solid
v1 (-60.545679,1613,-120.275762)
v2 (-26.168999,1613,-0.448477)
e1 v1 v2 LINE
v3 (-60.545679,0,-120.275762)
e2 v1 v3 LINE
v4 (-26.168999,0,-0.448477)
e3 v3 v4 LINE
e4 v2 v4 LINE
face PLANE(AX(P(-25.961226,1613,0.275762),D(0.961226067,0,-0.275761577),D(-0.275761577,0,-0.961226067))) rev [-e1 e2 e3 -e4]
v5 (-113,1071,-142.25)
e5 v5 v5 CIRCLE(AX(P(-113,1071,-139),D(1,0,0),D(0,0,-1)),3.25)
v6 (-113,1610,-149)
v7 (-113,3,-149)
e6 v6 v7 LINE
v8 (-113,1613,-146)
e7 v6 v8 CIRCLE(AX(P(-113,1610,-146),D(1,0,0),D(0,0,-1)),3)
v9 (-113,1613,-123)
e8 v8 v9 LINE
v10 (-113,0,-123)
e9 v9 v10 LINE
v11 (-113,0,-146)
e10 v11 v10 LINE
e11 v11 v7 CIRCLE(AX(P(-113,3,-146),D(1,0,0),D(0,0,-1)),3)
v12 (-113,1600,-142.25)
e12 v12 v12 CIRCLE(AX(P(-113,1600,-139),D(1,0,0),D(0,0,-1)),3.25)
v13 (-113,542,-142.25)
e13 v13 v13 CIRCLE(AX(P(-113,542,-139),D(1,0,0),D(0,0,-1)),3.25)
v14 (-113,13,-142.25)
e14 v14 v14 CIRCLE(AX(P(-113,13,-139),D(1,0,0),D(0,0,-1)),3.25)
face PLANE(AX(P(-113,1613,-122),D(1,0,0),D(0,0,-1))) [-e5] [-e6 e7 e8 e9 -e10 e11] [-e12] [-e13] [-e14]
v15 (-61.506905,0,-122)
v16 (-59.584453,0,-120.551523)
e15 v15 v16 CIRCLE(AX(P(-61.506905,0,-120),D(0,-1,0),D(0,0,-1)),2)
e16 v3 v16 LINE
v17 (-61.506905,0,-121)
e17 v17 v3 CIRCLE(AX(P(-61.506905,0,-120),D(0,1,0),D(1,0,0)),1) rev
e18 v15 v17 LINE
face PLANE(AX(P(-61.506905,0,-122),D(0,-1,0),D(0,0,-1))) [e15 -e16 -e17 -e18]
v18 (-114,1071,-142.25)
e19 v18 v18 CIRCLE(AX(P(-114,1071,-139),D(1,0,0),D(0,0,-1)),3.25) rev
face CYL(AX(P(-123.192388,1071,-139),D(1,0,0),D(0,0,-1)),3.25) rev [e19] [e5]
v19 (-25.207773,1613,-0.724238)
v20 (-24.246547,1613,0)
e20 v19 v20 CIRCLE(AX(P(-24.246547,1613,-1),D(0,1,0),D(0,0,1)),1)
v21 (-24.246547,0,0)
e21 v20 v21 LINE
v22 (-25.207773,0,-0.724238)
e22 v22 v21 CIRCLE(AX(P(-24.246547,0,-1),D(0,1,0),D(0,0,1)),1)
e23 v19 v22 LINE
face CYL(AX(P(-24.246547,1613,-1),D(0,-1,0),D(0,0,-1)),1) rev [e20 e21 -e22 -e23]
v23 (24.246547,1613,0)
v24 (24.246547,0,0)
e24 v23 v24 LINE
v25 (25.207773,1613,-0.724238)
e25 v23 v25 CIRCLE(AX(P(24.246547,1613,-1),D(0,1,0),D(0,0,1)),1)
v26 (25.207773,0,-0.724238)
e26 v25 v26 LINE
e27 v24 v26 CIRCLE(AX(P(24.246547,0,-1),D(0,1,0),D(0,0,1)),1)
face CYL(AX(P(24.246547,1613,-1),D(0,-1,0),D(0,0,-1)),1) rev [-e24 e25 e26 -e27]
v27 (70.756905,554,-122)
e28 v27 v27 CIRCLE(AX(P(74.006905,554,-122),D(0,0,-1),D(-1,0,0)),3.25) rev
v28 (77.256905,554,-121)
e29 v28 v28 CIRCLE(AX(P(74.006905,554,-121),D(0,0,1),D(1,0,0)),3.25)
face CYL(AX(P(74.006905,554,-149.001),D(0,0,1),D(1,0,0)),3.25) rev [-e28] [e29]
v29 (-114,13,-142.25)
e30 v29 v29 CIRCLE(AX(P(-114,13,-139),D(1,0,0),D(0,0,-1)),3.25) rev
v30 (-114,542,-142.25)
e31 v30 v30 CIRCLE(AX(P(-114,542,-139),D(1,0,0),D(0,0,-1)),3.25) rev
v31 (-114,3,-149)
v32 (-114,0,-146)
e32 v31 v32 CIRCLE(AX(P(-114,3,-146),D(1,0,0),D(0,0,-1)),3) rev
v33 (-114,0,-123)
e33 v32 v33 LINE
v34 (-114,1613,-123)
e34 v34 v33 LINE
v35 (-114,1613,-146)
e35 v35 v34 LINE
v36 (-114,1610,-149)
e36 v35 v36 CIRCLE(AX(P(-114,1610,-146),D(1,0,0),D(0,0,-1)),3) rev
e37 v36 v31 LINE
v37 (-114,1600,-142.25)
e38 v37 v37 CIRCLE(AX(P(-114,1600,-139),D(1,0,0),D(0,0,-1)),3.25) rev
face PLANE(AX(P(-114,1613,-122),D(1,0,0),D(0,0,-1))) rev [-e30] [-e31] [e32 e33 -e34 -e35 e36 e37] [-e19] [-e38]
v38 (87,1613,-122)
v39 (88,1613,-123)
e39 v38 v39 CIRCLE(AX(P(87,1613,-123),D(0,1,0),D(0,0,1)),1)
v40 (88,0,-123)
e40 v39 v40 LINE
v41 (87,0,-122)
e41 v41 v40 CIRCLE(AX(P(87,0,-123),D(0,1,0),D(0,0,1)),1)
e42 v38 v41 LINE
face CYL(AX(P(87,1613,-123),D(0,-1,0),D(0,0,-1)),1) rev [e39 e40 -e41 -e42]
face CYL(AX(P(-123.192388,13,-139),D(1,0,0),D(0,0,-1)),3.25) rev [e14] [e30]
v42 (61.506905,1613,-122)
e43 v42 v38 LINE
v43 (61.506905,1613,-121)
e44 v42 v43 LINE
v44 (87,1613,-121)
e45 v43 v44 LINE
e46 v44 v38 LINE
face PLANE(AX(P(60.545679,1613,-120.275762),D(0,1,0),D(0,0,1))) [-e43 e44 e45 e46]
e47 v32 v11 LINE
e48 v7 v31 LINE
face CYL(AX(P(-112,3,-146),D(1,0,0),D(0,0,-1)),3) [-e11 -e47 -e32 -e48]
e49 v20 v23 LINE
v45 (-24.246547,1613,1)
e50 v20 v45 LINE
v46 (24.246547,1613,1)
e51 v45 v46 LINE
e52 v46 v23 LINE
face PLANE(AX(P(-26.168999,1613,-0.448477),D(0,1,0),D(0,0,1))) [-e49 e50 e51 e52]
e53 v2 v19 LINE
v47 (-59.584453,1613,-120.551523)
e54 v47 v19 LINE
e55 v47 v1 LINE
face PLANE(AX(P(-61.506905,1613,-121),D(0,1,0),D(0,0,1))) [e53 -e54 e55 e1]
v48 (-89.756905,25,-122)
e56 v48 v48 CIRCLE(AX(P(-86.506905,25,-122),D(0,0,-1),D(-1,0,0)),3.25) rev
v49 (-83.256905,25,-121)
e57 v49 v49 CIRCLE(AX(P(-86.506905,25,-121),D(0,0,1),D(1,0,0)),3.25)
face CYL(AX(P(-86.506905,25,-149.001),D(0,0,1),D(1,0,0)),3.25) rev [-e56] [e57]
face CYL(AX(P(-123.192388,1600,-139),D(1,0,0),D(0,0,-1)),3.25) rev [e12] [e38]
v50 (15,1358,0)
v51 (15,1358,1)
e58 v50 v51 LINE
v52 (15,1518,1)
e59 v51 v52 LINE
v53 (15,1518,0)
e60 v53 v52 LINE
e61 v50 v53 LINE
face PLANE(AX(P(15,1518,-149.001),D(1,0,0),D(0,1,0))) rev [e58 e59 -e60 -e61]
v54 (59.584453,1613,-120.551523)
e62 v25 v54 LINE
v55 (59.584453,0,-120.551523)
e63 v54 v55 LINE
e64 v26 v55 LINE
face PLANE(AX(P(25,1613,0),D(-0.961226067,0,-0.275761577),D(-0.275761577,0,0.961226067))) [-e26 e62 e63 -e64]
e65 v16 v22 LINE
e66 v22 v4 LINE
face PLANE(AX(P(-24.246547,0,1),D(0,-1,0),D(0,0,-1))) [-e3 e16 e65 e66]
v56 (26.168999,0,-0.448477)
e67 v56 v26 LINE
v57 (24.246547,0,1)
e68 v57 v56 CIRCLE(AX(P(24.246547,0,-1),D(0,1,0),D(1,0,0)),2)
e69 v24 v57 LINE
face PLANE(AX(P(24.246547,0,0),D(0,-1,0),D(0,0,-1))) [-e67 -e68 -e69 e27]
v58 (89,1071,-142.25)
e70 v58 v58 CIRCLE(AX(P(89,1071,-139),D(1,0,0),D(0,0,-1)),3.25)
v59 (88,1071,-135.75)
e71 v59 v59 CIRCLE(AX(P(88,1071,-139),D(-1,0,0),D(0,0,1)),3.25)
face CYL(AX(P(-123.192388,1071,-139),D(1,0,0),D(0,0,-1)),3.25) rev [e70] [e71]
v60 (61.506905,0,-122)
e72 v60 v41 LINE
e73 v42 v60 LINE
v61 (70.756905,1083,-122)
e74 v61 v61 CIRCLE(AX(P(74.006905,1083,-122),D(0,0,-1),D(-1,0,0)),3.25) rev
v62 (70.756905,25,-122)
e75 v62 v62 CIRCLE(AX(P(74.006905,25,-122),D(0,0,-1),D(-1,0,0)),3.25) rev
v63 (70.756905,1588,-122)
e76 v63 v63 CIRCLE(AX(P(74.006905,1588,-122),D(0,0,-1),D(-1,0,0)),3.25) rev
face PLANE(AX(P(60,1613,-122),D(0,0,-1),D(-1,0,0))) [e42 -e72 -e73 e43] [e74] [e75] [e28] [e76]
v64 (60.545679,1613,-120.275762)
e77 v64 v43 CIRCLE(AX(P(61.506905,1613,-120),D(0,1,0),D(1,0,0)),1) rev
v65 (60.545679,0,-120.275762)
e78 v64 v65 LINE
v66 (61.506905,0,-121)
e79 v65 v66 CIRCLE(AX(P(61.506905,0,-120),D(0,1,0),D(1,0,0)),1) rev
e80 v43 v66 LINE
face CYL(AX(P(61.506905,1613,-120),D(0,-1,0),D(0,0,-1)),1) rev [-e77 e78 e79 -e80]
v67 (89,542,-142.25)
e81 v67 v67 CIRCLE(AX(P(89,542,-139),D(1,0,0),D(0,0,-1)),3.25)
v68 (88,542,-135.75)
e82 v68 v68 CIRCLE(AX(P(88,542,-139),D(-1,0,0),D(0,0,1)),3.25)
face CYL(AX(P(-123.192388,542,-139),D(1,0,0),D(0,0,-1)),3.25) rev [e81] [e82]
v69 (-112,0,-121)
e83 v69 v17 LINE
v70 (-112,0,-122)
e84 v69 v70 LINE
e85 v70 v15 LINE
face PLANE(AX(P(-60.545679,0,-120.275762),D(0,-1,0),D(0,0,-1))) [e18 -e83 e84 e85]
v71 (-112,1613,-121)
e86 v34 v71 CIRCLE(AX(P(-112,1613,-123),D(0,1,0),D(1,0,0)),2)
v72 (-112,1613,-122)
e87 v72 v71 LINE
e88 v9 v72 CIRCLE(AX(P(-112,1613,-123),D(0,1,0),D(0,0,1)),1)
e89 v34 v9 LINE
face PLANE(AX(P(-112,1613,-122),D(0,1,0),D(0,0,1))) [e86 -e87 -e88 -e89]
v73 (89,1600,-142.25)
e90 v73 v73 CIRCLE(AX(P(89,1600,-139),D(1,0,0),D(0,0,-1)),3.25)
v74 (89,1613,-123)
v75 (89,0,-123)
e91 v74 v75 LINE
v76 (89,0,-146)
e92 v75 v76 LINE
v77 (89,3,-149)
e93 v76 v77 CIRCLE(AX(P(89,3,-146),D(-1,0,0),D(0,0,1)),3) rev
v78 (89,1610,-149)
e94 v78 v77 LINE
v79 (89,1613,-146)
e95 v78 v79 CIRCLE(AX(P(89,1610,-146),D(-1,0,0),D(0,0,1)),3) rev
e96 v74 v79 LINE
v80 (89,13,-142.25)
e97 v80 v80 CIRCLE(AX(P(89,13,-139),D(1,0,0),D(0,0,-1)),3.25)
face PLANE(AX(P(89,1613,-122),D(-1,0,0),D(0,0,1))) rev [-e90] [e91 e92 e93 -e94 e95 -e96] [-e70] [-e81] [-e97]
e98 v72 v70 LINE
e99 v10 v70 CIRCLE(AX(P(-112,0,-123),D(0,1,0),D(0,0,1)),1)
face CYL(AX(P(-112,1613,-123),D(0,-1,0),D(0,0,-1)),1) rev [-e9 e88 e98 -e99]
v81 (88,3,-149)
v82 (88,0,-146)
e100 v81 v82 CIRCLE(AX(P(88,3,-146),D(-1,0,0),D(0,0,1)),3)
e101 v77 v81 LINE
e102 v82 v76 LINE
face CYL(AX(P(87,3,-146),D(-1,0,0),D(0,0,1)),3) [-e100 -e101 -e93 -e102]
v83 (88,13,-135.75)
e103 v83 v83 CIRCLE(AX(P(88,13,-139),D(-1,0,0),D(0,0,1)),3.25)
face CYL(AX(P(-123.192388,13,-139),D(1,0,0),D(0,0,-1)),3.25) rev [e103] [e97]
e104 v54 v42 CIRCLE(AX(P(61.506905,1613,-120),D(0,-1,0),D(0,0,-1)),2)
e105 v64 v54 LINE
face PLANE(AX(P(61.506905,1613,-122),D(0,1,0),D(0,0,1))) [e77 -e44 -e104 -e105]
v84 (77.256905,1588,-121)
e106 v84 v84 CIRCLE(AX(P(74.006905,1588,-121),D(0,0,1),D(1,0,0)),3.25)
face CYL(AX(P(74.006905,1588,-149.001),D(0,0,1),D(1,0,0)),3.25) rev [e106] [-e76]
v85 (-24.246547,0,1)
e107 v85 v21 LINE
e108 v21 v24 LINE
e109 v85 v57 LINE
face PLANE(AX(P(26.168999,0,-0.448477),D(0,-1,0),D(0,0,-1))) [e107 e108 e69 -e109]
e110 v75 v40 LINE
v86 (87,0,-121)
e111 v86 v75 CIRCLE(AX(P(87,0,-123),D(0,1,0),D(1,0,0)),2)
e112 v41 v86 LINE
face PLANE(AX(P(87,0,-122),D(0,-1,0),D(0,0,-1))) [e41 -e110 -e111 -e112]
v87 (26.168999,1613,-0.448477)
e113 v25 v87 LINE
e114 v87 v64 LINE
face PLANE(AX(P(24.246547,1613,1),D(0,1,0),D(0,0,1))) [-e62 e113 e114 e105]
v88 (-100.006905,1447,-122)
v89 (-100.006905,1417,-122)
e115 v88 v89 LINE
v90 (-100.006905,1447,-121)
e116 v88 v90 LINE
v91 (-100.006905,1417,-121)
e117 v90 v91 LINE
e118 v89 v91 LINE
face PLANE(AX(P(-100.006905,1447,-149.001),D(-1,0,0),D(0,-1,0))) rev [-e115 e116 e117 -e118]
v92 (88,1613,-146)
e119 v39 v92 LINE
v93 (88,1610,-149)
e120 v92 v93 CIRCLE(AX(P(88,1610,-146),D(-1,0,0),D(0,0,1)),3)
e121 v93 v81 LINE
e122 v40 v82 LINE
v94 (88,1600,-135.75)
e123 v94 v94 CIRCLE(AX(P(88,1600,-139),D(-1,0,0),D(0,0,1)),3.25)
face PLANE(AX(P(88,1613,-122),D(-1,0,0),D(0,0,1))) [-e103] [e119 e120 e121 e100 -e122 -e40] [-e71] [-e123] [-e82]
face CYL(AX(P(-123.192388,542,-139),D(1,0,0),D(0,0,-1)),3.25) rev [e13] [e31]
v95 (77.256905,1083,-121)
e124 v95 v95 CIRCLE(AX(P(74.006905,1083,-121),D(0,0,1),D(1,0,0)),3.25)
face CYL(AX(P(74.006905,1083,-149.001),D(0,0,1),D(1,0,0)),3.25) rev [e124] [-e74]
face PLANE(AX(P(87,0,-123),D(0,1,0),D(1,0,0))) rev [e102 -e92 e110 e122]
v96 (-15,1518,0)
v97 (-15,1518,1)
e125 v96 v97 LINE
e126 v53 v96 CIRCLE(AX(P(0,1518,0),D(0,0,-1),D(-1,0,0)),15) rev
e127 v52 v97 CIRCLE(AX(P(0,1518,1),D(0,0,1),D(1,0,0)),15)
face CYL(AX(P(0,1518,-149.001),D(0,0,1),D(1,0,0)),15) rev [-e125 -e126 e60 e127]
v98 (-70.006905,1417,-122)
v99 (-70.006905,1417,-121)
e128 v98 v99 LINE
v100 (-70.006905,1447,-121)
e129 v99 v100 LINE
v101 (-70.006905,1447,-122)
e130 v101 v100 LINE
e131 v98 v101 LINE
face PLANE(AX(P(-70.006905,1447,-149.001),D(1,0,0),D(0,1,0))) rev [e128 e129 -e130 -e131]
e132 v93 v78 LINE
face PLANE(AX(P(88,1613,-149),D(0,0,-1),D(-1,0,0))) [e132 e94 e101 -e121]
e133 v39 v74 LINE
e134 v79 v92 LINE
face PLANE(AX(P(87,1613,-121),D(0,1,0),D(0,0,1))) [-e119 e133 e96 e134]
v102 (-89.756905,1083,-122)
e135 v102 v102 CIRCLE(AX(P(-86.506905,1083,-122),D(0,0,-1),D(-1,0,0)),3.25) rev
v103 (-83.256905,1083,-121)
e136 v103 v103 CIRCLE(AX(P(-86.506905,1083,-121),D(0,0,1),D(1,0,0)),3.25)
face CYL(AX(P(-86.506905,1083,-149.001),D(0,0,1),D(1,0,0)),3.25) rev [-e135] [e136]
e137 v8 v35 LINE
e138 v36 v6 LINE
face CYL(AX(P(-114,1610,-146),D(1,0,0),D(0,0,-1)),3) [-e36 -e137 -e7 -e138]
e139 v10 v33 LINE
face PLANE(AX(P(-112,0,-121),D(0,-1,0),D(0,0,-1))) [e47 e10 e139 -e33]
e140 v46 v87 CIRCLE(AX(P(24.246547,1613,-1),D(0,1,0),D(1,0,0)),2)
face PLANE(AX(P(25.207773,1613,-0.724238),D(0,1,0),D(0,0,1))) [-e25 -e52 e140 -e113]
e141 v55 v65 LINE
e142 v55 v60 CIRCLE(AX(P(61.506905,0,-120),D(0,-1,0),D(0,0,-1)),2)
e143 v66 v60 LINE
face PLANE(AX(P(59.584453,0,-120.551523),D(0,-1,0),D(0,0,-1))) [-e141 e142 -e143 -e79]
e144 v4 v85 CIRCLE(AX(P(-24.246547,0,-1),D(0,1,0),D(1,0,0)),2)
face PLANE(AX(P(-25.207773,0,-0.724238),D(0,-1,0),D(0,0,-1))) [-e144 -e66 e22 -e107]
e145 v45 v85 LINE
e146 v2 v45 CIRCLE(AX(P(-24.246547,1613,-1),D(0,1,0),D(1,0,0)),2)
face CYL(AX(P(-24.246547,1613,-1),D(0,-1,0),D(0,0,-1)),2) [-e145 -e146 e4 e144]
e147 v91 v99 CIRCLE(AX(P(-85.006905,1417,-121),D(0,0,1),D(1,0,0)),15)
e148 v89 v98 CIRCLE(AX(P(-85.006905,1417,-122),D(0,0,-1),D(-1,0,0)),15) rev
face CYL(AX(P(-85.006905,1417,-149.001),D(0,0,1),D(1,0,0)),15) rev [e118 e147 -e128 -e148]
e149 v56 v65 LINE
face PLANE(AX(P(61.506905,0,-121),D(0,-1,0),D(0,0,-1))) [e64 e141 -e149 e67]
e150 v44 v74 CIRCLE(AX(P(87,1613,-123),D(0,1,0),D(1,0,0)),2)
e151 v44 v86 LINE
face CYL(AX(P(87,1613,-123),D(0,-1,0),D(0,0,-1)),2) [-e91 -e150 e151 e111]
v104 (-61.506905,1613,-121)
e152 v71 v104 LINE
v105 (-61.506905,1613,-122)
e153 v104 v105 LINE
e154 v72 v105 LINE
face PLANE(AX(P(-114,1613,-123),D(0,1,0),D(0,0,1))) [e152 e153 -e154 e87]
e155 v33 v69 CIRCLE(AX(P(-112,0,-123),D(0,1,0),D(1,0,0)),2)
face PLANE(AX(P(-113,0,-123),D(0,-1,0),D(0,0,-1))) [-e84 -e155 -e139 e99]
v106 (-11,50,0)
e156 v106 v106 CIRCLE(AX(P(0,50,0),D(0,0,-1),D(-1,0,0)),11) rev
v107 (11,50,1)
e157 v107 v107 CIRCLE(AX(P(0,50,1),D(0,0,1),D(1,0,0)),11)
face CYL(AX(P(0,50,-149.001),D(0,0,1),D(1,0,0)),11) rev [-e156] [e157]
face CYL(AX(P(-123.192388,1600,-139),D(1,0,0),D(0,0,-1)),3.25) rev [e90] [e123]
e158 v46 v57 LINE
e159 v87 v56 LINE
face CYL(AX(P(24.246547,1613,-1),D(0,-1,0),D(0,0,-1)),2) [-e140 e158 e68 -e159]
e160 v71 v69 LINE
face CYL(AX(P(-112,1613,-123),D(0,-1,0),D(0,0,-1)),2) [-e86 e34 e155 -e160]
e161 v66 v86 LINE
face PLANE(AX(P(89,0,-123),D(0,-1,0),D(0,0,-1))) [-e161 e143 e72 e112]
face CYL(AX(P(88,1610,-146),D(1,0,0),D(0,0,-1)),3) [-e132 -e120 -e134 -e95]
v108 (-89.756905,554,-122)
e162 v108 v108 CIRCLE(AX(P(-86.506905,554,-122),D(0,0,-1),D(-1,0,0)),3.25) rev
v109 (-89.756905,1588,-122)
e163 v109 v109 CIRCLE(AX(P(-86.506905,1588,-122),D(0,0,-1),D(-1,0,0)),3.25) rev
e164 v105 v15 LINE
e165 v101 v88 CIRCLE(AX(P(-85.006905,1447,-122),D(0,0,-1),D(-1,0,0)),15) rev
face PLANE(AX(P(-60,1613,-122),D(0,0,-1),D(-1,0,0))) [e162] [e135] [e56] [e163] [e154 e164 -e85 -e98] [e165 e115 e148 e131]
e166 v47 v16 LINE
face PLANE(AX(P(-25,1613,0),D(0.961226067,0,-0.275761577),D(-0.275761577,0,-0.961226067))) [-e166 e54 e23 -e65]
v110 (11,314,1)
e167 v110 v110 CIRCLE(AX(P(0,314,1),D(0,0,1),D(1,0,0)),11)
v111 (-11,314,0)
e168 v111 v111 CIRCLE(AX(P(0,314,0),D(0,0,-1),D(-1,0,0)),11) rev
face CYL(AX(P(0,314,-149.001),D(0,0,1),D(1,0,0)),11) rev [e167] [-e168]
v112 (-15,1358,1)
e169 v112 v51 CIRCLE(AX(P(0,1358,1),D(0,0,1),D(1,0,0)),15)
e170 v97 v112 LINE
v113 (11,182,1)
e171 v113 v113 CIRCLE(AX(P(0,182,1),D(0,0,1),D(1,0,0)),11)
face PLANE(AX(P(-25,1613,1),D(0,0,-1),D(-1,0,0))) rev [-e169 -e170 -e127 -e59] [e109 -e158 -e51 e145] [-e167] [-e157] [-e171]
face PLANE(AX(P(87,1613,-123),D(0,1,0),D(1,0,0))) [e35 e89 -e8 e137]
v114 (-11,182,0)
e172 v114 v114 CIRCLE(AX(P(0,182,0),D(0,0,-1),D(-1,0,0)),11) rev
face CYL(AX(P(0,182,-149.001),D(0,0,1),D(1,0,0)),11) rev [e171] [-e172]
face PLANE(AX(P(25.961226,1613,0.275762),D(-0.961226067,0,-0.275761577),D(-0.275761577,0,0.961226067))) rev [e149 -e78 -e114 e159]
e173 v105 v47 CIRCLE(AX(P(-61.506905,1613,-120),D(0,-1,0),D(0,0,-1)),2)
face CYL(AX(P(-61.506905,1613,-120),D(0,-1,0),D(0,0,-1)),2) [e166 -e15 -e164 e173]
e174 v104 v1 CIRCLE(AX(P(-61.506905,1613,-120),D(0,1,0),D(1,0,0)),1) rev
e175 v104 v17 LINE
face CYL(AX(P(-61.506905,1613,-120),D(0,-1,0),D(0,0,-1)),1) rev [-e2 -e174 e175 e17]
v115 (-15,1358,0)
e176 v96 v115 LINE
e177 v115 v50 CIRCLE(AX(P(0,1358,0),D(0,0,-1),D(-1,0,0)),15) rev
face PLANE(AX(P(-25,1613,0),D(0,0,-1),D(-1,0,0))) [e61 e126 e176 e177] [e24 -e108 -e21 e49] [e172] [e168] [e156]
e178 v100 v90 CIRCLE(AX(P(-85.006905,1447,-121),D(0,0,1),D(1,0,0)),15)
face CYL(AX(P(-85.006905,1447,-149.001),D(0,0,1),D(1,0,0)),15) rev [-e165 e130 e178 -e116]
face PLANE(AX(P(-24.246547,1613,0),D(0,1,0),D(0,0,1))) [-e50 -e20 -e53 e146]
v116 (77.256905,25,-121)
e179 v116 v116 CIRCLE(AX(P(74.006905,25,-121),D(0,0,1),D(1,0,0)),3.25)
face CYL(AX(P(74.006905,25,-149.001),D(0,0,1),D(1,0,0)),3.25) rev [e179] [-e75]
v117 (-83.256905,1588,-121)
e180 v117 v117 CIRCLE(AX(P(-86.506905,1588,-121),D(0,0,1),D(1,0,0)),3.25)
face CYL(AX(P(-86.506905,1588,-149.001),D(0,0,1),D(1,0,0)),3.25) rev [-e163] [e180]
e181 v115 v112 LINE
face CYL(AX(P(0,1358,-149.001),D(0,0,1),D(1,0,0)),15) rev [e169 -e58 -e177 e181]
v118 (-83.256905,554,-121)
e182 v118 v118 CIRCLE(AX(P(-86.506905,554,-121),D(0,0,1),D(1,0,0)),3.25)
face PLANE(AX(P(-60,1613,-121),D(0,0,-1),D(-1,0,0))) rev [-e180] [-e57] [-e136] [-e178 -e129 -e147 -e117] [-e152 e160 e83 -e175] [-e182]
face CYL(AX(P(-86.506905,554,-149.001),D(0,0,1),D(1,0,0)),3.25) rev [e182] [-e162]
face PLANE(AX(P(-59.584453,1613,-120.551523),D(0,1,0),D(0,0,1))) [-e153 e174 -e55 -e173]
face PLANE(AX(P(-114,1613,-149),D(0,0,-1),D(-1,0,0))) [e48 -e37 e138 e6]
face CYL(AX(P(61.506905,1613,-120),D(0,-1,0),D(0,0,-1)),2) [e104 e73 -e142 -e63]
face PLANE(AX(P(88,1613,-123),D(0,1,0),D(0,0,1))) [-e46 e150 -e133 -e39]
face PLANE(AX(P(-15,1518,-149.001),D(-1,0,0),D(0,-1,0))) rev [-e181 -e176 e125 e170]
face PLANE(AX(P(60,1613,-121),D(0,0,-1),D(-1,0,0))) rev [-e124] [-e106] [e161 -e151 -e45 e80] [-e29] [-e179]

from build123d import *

# Parameters (mm, degrees)
BASE_FLANGE1_DEPTH  = 1613
FILLET1_R           = 3
CUT_EXTRUDE1_REACH  = 1625.966
SKETCH6_R           = 11
LPATTERN1_COUNT     = 3
LPATTERN1_PITCH     = 132
CUT_EXTRUDE4_REACH  = 1634.045
SKETCH10_R          = 3.25
LPATTERN5_COUNT     = 4
LPATTERN5_PITCH     = 529
CUT_EXTRUDE5_REACH  = 1623.619
CUT_EXTRUDE6_REACH  = 1623.619
SKETCH13_R          = 3.25
CUT_EXTRUDE7_REACH  = 1623.619
SKETCH14_R          = 3.25
LPATTERN6_COUNT     = 3
LPATTERN6_PITCH     = 529
CUT_EXTRUDE8_REACH  = 1623.619
SKETCH15_R          = 3.25
CUT_EXTRUDE9_REACH  = 1623.619
SKETCH16_R          = 3.25
CUT_EXTRUDE10_REACH = 1625.966


# Sheet-metal steps are written as plain solids
with BuildPart() as part:
    # Sketch1 → Base-Flange1 (new body)
    with BuildSketch(Plane(origin=(0, 0, 0), x_dir=(1, 0, 0), z_dir=(0, 1, 0))):
        with BuildLine():
            Line((-113, 149), (-113, 123))
            ThreePointArc((-113, 123), (-112.707106781, 122.292893219), (-112, 122))
            Line((-112, 122), (-61.506905499, 122))
            ThreePointArc((-61.506905499, 122), (-60.303378662, 121.597348789), (-59.584453364, 120.551523153))
            Line((-59.584453364, 120.551523153), (-25.207773318, 0.724238423))
            ThreePointArc((-25.207773318, 0.724238423), (-24.848310669, 0.201325606), (-24.246547251, 0))
            Line((-24.246547251, 0), (24.246547251, 0))
            ThreePointArc((24.246547251, 0), (24.848310669, 0.201325606), (25.207773318, 0.724238423))
            Line((25.207773318, 0.724238423), (59.584453364, 120.551523153))
            ThreePointArc((59.584453364, 120.551523153), (60.303378662, 121.597348789), (61.506905499, 122))
            Line((61.506905499, 122), (87, 122))
            ThreePointArc((87, 122), (87.707106781, 122.292893219), (88, 123))
            Line((88, 123), (88, 149))
            Line((88, 149), (89, 149))
            Line((89, 149), (89, 123))
            ThreePointArc((89, 123), (88.414213562, 121.585786438), (87, 121))
            Line((87, 121), (61.506905499, 121))
            ThreePointArc((61.506905499, 121), (60.90514208, 120.798674394), (60.545679431, 120.275761577))
            Line((60.545679431, 120.275761577), (26.168999386, 0.448476847))
            ThreePointArc((26.168999386, 0.448476847), (25.450074087, -0.597348789), (24.246547251, -1))
            Line((24.246547251, -1), (-24.246547251, -1))
            ThreePointArc((-24.246547251, -1), (-25.450074087, -0.597348789), (-26.168999386, 0.448476847))
            Line((-26.168999386, 0.448476847), (-60.545679431, 120.275761577))
            ThreePointArc((-60.545679431, 120.275761577), (-60.90514208, 120.798674394), (-61.506905499, 121))
            Line((-61.506905499, 121), (-112, 121))
            ThreePointArc((-112, 121), (-113.414213562, 121.585786438), (-114, 123))
            Line((-114, 123), (-114, 149))
            Line((-114, 149), (-113, 149))
        make_face()
    extrude(amount=BASE_FLANGE1_DEPTH)

    # Fillet1
    fillet1_edges = [part.edges().sort_by_distance(p)[0] for p in [
        (-113.5, 0, -149),
        (88.5, 0, -149),
        (-113.5, 1613, -149),
        (88.5, 1613, -149),
    ]]
    fillet(fillet1_edges, radius=FILLET1_R)

    # Sketch6 → Cut-Extrude1 (cut, up to next)
    with BuildSketch(Plane.XY.offset(1), mode=Mode.PRIVATE) as cut_extrude1_sk1:
        with Locations((0, 50)):
            Circle(SKETCH6_R)
    cut_extrude1_tool1 = extrude(cut_extrude1_sk1.sketch, amount=-CUT_EXTRUDE1_REACH, mode=Mode.PRIVATE) & part.part
    cut_extrude1 = cut_extrude1_tool1.solids().sort_by_distance((0, 50, 1))[0]
    add(cut_extrude1, mode=Mode.SUBTRACT)

    # LPattern1: Cut-Extrude1 ×3
    with Locations(*[(0, i * LPATTERN1_PITCH, 0) for i in range(1, LPATTERN1_COUNT)]):
        add(cut_extrude1, mode=Mode.SUBTRACT)

    # Cut-Extrude4: up to this face of the body (flat: up to its plane)
    cut_extrude4_end = Plane(part.part.faces().sort_by_distance((-114, 806.5, -135.998864211))[0])
    # Sketch10 → Cut-Extrude4 (cut, up to the picked face)
    with BuildSketch(Plane(origin=(89, 0, -5.5), x_dir=(0, 0, -1), z_dir=(1, 0, 0)), mode=Mode.PRIVATE) as cut_extrude4_sk1:
        with Locations((133.5, 13)):
            Circle(SKETCH10_R)
    cut_extrude4_tool1 = split(extrude(cut_extrude4_sk1.sketch, amount=-CUT_EXTRUDE4_REACH, mode=Mode.PRIVATE), bisect_by=cut_extrude4_end, keep=Keep.BOTH, mode=Mode.PRIVATE)
    cut_extrude4 = cut_extrude4_tool1.solids().sort_by(Axis((89, 13, -139), (-1, 0, 0)))[0]
    add(cut_extrude4, mode=Mode.SUBTRACT)

    # LPattern5: Cut-Extrude4 ×4
    with Locations(*[(0, i * LPATTERN5_PITCH, 0) for i in range(1, LPATTERN5_COUNT)]):
        add(cut_extrude4, mode=Mode.SUBTRACT)

    # Sketch12 → Cut-Extrude5 (cut, up to next)
    with BuildSketch(Plane.XY.offset(-121), mode=Mode.PRIVATE) as cut_extrude5_sk1:
        with BuildLine():
            Line((-70.006905499, 1447), (-70.006905499, 1417))
            ThreePointArc((-70.006905499, 1417), (-85.006905499, 1402), (-100.006905499, 1417))
            Line((-100.006905499, 1417), (-100.006905499, 1447))
            ThreePointArc((-100.006905499, 1447), (-85.006905499, 1462), (-70.006905499, 1447))
        make_face()
    cut_extrude5_tool1 = extrude(cut_extrude5_sk1.sketch, amount=-CUT_EXTRUDE5_REACH, mode=Mode.PRIVATE) & part.part
    add(cut_extrude5_tool1.solids().sort_by_distance((-85.006905, 1432, -121))[0], mode=Mode.SUBTRACT)

    # Sketch13 → Cut-Extrude6 (cut, up to next)
    with BuildSketch(Plane.XY.offset(-121), mode=Mode.PRIVATE) as cut_extrude6_sk1:
        with Locations((-86.506905499, 25)):
            Circle(SKETCH13_R)
    cut_extrude6_tool1 = extrude(cut_extrude6_sk1.sketch, amount=-CUT_EXTRUDE6_REACH, mode=Mode.PRIVATE) & part.part
    cut_extrude6 = cut_extrude6_tool1.solids().sort_by_distance((-86.506905, 25, -121))[0]
    add(cut_extrude6, mode=Mode.SUBTRACT)

    # Sketch14 → Cut-Extrude7 (cut, up to next)
    with BuildSketch(Plane.XY.offset(-121), mode=Mode.PRIVATE) as cut_extrude7_sk1:
        with Locations((74.006905499, 25)):
            Circle(SKETCH14_R)
    cut_extrude7_tool1 = extrude(cut_extrude7_sk1.sketch, amount=-CUT_EXTRUDE7_REACH, mode=Mode.PRIVATE) & part.part
    cut_extrude7 = cut_extrude7_tool1.solids().sort_by_distance((74.006905, 25, -121))[0]
    add(cut_extrude7, mode=Mode.SUBTRACT)

    # LPattern6: Cut-Extrude6, Cut-Extrude7 ×3
    with Locations(*[(0, i * LPATTERN6_PITCH, 0) for i in range(1, LPATTERN6_COUNT)]):
        add(cut_extrude6, mode=Mode.SUBTRACT)
        add(cut_extrude7, mode=Mode.SUBTRACT)

    # Sketch15 → Cut-Extrude8 (cut, up to next)
    with BuildSketch(Plane.XY.offset(-121), mode=Mode.PRIVATE) as cut_extrude8_sk1:
        with Locations((-86.506905499, 1588)):
            Circle(SKETCH15_R)
    cut_extrude8_tool1 = extrude(cut_extrude8_sk1.sketch, amount=-CUT_EXTRUDE8_REACH, mode=Mode.PRIVATE) & part.part
    add(cut_extrude8_tool1.solids().sort_by_distance((-86.506905, 1588, -121))[0], mode=Mode.SUBTRACT)

    # Sketch16 → Cut-Extrude9 (cut, up to next)
    with BuildSketch(Plane.XY.offset(-121), mode=Mode.PRIVATE) as cut_extrude9_sk1:
        with Locations((74.006905499, 1588)):
            Circle(SKETCH16_R)
    cut_extrude9_tool1 = extrude(cut_extrude9_sk1.sketch, amount=-CUT_EXTRUDE9_REACH, mode=Mode.PRIVATE) & part.part
    add(cut_extrude9_tool1.solids().sort_by_distance((74.006905, 1588, -121))[0], mode=Mode.SUBTRACT)

    # Sketch17 → Cut-Extrude10 (cut, up to next)
    with BuildSketch(Plane.XY.offset(1), mode=Mode.PRIVATE) as cut_extrude10_sk1:
        with BuildLine():
            Line((15, 1518), (15, 1358))
            ThreePointArc((15, 1358), (0, 1343), (-15, 1358))
            Line((-15, 1358), (-15, 1518))
            ThreePointArc((-15, 1518), (0, 1533), (15, 1518))
        make_face()
    cut_extrude10_tool1 = extrude(cut_extrude10_sk1.sketch, amount=-CUT_EXTRUDE10_REACH, mode=Mode.PRIVATE) & part.part
    add(cut_extrude10_tool1.solids().sort_by_distance((0, 1438, 1))[0], mode=Mode.SUBTRACT)


solid = part.part
